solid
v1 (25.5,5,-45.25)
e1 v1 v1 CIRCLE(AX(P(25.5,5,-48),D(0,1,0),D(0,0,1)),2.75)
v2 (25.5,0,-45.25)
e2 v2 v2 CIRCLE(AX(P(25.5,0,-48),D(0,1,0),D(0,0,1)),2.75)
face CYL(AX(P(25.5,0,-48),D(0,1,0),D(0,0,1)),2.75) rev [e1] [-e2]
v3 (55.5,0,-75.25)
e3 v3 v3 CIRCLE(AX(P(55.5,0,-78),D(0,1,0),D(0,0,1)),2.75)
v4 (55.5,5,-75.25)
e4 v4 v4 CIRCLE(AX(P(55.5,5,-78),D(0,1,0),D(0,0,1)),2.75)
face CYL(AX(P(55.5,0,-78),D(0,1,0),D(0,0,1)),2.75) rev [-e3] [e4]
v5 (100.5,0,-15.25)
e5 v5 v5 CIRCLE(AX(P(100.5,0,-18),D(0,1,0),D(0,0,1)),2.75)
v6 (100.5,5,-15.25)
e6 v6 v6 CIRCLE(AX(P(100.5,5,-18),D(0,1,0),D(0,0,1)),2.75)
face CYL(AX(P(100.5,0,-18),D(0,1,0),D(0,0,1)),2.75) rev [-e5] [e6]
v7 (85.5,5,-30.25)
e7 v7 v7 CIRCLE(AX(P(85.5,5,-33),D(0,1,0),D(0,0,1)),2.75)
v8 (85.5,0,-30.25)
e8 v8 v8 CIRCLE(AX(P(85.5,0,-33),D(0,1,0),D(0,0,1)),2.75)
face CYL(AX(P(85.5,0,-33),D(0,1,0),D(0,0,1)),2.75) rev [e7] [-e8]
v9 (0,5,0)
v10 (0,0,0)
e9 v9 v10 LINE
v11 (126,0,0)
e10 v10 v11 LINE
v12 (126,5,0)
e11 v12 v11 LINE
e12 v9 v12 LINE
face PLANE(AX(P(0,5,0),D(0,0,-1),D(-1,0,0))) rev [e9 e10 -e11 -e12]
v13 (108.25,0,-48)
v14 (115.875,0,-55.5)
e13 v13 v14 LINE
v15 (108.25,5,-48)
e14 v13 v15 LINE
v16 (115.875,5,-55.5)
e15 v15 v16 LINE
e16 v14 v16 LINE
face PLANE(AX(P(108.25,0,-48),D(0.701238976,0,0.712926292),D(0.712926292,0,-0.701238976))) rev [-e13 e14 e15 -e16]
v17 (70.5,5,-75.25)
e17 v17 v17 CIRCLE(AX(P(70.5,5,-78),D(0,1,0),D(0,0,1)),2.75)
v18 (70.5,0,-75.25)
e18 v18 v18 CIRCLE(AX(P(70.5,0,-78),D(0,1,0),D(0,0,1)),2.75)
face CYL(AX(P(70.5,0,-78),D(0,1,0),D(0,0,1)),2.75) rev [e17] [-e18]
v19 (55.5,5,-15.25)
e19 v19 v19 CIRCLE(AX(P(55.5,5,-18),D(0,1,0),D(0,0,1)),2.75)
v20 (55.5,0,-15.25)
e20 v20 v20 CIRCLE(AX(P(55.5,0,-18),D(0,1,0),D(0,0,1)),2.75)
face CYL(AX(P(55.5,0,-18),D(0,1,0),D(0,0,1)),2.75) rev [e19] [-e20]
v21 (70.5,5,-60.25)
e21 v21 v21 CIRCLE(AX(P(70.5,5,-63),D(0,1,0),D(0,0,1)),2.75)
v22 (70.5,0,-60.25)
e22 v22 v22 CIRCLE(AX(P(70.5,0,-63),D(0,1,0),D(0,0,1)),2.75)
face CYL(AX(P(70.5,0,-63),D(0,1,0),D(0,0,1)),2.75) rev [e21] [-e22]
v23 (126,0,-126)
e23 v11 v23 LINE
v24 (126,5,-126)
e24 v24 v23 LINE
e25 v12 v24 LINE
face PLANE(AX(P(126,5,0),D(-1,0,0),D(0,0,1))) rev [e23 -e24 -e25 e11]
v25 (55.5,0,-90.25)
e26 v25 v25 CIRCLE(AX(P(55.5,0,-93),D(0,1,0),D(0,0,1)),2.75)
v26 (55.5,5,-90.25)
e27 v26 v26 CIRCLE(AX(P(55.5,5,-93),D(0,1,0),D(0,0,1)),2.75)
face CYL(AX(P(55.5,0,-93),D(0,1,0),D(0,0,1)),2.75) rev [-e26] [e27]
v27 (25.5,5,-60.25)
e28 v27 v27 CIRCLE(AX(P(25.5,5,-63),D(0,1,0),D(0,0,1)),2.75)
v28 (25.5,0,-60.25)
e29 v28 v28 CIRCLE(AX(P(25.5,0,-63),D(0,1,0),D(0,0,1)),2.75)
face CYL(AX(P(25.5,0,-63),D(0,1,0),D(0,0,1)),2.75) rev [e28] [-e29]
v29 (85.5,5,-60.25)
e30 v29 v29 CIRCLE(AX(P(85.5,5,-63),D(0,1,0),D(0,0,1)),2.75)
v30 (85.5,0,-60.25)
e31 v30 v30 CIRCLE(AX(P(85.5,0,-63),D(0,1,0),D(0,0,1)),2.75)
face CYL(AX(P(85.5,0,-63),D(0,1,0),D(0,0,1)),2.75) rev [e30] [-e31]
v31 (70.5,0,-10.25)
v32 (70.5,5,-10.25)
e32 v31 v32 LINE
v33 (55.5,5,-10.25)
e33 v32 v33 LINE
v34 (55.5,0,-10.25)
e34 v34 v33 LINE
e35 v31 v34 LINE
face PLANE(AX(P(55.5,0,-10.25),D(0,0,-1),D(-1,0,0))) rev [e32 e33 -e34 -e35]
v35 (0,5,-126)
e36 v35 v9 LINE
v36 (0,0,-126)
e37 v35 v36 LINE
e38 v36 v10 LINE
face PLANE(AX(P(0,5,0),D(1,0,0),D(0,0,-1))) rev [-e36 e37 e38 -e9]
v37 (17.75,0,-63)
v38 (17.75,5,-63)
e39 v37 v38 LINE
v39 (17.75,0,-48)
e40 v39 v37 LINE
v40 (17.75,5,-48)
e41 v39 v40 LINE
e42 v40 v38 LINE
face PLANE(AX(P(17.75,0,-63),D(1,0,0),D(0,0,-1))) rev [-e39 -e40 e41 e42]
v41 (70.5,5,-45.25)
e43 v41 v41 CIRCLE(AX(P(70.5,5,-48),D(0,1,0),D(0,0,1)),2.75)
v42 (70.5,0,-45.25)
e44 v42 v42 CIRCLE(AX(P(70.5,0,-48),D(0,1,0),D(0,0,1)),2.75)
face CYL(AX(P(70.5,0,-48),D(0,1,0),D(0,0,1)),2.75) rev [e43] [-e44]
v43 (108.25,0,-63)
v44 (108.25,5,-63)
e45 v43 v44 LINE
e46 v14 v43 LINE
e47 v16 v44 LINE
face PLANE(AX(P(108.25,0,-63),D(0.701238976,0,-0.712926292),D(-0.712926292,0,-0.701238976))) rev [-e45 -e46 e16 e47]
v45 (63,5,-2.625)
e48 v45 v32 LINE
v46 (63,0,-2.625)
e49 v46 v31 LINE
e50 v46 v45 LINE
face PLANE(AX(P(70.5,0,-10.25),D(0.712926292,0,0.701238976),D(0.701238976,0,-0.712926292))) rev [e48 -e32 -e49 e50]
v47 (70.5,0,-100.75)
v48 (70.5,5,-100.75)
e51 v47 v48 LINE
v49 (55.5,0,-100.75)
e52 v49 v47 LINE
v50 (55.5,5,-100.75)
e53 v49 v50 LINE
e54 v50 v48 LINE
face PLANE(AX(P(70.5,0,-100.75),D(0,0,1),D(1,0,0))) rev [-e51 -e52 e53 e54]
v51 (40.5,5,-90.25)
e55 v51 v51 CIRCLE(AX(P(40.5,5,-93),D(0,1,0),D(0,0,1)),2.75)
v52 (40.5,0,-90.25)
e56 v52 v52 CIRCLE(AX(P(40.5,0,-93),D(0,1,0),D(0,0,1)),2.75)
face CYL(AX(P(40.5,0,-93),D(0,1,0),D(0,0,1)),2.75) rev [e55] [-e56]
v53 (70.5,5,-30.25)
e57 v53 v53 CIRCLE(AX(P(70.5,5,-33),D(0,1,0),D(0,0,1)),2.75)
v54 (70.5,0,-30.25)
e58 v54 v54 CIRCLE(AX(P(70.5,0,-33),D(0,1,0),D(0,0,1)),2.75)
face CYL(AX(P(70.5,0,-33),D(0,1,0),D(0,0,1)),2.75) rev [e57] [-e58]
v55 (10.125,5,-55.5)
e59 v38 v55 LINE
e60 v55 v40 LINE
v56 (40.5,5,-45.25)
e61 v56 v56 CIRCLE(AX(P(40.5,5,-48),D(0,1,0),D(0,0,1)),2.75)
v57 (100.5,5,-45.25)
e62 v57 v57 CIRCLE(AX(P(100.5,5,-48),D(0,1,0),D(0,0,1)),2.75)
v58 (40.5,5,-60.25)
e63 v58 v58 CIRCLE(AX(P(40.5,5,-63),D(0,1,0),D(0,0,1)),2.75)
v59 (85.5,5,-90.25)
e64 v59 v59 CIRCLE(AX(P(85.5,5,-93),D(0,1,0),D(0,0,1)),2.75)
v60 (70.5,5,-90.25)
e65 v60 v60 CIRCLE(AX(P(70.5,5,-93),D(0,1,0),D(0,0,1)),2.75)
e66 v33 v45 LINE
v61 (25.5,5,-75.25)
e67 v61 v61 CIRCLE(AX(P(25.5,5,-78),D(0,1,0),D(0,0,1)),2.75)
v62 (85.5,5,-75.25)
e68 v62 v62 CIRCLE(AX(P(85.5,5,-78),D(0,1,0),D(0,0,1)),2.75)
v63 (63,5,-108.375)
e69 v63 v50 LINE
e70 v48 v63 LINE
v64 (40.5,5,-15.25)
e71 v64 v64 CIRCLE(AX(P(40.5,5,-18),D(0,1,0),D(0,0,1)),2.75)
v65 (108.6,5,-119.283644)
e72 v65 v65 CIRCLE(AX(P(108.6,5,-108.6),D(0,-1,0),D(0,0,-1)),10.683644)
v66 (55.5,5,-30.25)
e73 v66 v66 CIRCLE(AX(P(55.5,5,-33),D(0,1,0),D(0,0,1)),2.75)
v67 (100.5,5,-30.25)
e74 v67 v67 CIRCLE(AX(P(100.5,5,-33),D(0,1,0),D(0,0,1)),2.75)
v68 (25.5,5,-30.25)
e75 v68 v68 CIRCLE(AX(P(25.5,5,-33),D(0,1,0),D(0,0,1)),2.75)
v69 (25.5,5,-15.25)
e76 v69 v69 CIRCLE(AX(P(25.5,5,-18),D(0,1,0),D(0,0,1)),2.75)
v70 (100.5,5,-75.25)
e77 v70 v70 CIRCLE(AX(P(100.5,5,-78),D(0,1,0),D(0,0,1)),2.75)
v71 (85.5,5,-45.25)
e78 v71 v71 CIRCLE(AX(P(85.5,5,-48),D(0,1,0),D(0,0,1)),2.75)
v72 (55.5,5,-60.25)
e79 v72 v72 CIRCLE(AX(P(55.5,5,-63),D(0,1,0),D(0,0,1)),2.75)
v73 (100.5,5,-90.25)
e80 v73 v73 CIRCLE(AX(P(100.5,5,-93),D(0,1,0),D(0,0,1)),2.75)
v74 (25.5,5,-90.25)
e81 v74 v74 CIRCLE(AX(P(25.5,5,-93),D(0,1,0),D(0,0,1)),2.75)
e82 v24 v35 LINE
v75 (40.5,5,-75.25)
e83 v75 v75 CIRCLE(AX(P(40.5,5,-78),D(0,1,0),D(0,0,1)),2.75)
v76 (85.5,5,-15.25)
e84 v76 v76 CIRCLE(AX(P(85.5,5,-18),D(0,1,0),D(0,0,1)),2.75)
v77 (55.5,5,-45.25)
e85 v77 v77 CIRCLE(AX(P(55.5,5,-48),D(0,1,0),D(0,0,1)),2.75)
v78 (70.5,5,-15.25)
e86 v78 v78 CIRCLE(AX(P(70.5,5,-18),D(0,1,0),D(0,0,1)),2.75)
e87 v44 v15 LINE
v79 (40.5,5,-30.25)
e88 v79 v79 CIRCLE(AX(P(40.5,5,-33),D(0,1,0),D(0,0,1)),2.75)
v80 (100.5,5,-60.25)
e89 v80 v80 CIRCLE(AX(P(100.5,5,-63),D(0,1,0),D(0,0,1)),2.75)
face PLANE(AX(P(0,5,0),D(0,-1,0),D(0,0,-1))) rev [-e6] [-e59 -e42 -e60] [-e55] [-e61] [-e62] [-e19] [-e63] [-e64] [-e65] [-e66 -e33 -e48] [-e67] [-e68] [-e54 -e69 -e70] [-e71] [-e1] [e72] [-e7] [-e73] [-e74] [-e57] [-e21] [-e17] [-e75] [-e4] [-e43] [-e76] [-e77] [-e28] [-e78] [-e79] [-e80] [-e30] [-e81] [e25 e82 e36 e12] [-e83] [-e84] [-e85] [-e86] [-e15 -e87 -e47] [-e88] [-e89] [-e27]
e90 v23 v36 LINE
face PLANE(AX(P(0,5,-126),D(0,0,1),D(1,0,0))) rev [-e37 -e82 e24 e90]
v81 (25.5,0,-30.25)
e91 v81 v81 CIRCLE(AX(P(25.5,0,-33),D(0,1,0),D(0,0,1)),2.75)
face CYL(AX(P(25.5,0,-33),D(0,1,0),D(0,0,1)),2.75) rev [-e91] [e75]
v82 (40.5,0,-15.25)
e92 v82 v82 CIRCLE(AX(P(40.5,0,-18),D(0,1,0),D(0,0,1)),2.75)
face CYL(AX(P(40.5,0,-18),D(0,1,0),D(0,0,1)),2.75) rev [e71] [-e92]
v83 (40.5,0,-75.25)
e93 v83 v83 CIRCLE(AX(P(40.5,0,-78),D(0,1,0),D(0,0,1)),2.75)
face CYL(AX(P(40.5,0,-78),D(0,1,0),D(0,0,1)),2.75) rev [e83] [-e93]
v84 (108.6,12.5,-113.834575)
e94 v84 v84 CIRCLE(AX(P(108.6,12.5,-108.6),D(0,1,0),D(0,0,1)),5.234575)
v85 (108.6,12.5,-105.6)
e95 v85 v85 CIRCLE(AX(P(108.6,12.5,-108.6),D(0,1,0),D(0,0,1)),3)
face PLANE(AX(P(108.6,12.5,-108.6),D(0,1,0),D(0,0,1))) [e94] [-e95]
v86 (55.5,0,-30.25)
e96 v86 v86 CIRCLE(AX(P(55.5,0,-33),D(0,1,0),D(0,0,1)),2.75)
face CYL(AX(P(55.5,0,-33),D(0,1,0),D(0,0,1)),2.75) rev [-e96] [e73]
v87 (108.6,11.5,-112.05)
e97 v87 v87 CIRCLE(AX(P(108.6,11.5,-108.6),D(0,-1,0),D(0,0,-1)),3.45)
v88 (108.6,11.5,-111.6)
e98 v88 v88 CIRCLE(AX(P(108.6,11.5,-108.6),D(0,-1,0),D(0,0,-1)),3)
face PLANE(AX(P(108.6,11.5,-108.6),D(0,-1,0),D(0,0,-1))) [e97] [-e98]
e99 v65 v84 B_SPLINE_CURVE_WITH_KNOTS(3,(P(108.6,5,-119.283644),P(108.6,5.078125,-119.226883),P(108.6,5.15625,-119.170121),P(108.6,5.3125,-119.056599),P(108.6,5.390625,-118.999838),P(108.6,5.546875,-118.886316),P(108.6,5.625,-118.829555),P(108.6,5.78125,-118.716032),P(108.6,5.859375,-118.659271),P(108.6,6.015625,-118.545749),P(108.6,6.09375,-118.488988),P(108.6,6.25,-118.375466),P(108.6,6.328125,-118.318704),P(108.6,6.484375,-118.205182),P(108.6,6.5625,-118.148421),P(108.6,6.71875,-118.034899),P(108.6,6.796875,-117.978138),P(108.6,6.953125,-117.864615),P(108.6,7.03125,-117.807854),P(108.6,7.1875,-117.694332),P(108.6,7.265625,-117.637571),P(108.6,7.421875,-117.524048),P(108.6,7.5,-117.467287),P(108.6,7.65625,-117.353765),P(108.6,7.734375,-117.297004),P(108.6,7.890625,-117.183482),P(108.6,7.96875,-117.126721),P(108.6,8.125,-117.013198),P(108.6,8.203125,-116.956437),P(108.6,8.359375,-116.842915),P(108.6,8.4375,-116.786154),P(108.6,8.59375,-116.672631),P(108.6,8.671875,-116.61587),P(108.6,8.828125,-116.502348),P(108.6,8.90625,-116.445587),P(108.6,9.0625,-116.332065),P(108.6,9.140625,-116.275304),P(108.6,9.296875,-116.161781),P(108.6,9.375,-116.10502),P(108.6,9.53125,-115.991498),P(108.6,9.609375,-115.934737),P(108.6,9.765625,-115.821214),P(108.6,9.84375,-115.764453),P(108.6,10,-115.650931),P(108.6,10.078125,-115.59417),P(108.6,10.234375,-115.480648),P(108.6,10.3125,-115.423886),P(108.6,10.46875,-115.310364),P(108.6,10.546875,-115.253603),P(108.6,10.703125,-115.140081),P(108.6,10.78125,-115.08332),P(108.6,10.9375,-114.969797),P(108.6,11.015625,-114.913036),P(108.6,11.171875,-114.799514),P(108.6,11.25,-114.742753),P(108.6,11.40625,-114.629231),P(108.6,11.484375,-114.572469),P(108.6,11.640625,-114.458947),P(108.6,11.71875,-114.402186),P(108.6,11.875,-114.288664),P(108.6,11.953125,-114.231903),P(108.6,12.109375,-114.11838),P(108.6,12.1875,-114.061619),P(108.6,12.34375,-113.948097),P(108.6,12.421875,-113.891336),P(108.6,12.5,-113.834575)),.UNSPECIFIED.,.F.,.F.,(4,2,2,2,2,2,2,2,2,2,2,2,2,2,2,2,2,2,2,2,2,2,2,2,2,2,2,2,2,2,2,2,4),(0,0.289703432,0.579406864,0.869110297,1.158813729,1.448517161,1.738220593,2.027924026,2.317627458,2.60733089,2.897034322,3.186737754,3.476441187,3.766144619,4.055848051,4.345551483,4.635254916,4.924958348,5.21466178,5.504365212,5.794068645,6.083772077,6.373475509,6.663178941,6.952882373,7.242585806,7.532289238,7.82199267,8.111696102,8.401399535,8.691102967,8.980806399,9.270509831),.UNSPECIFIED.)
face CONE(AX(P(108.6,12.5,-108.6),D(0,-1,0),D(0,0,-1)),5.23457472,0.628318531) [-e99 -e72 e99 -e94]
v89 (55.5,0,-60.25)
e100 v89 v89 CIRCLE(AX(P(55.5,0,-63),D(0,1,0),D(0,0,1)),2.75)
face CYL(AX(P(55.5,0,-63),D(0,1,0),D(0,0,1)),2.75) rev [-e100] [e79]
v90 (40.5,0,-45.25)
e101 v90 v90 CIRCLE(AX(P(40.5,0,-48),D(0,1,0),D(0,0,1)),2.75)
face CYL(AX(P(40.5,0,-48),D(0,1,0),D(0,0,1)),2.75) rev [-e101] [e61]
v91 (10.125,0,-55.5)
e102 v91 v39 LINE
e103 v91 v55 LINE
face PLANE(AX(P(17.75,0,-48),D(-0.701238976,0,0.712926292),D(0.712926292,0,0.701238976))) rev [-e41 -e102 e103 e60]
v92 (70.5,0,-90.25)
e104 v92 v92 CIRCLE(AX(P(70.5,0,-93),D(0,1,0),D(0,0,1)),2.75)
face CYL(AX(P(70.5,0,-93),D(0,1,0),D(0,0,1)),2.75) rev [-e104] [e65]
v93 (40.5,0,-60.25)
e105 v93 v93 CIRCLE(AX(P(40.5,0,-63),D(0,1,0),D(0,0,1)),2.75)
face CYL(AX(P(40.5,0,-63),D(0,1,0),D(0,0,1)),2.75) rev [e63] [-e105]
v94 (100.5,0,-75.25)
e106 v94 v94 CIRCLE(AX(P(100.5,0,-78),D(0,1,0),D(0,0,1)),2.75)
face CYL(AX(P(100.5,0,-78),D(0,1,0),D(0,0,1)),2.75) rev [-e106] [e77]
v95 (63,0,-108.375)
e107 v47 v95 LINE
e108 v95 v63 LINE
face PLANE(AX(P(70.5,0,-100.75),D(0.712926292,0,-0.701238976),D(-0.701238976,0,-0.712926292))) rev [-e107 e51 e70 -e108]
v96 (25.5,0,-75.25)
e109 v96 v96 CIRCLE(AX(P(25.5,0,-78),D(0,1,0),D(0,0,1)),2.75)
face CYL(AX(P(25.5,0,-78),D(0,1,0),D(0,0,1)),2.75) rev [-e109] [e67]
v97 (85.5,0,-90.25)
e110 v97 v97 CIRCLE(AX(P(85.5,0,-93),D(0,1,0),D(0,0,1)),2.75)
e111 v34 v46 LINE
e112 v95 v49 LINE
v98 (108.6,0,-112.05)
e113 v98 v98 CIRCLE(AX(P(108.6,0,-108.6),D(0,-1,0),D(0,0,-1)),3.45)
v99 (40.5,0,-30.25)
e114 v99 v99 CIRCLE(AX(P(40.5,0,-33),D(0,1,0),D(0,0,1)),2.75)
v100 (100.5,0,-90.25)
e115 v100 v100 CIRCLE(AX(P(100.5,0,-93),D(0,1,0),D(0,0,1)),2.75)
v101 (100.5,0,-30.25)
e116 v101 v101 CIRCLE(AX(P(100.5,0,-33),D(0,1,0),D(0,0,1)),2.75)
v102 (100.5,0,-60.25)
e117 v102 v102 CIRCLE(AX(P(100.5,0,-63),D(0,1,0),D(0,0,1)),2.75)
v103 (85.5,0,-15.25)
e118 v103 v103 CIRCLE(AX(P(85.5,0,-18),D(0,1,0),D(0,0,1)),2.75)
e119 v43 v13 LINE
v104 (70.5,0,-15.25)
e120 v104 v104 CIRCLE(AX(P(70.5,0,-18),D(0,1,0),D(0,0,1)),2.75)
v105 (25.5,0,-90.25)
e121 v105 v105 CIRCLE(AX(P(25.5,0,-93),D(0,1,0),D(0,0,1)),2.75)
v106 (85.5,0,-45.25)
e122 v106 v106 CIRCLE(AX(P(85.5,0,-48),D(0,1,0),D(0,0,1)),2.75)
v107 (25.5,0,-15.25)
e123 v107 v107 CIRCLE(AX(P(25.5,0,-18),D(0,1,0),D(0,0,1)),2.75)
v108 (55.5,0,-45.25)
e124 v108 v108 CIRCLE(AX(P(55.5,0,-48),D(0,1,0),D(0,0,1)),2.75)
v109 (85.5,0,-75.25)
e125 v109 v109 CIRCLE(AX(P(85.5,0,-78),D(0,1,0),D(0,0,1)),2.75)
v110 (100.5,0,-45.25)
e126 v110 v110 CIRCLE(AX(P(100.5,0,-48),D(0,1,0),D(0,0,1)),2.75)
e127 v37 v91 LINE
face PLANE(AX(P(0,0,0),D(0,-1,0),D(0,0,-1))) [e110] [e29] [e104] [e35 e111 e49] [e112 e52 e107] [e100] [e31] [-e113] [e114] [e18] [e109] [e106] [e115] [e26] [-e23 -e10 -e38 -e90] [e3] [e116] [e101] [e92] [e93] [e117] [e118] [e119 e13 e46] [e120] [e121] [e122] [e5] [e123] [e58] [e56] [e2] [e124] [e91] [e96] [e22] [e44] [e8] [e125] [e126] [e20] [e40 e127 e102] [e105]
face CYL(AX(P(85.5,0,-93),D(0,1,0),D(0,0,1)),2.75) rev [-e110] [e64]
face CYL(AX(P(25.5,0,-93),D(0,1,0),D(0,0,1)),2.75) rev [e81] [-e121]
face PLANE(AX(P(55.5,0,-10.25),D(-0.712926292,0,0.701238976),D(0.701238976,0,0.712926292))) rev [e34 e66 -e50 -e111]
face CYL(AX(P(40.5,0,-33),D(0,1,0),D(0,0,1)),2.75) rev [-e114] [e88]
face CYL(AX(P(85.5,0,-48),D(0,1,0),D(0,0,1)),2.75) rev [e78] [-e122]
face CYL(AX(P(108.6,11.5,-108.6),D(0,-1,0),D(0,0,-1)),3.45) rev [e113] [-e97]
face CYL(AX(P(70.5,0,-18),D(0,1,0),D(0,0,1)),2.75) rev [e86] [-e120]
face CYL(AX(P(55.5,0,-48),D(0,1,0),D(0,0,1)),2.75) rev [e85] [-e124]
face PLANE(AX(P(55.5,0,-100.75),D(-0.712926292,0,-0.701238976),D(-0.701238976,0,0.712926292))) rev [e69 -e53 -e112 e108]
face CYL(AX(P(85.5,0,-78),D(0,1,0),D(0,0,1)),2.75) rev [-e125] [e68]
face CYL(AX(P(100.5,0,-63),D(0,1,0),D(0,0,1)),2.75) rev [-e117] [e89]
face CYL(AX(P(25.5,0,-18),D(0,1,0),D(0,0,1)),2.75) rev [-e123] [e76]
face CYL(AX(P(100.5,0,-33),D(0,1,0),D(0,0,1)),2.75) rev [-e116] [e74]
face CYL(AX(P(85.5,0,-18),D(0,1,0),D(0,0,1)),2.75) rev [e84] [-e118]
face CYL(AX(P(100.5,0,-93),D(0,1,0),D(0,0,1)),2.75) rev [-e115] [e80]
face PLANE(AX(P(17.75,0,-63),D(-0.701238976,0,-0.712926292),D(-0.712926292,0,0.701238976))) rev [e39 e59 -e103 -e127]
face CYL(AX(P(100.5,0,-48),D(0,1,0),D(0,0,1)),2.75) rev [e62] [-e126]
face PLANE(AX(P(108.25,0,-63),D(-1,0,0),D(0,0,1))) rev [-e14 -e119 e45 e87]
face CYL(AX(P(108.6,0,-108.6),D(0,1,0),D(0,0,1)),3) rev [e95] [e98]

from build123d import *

# Parameters (mm, degrees)
SKETCH1_W           = 126
SKETCH1_H           = 126
BOSS_EXTRUDE1_DEPTH = 5
SKETCH3_R           = 12.5
BOSS_EXTRUDE2_DEPTH = 7.5
SKETCH4_R           = 3.45
CUT_EXTRUDE1_DEPTH  = 11.5
SKETCH6_R           = 3
CUT_EXTRUDE2_DEPTH  = 179.628805068
CHAMFER1_SIZE       = 10
CHAMFER1_SIZE_2     = 7.26542528
SKETCH7_R           = 2.75
CUT_EXTRUDE3_DEPTH  = 179.348675353
CUT_EXTRUDE4_DEPTH  = 179.348675353


with BuildPart() as part:
    # Sketch1 → Boss-Extrude1 (new body)
    with BuildSketch(Plane(origin=(0, 0, 0), x_dir=(1, 0, 0), z_dir=(0, 1, 0))):
        with Locations((63, 63)):
            Rectangle(SKETCH1_W, SKETCH1_H)
    extrude(amount=BOSS_EXTRUDE1_DEPTH)

    # Sketch3 → Boss-Extrude2 (add)
    with BuildSketch(Plane(origin=(0, 5, 0), x_dir=(1, 0, 0), z_dir=(0, 1, 0))):
        with Locations(Location((108.6, 108.6, 0), (0, 0, 90))):
            Circle(SKETCH3_R)
    extrude(amount=BOSS_EXTRUDE2_DEPTH)

    # Sketch4 → Cut-Extrude1 (cut)
    with BuildSketch(Plane.XZ):
        with Locations(Location((108.6, -108.6, 0), (0, 0, 270))):
            Circle(SKETCH4_R)
    extrude(amount=-CUT_EXTRUDE1_DEPTH, mode=Mode.SUBTRACT)

    # Sketch6 → Cut-Extrude2 (cut, through all)
    with BuildSketch(Plane(origin=(0, 12.5, 0), x_dir=(1, 0, 0), z_dir=(0, 1, 0))):
        with Locations(Location((108.6, 108.6, 0), (0, 0, 270))):
            Circle(SKETCH6_R)
    extrude(amount=-CUT_EXTRUDE2_DEPTH, mode=Mode.SUBTRACT)

    # Chamfer1
    # the kernel refuses this chamfer: 10, 7.26542528 mm, written as the material it takes off along each edge
    with BuildSketch(Plane(origin=(108.6, 12.5, -108.6), x_dir=(0, 0, -1), z_dir=(1, 0, 0))) as chamfer1_piece_1_section:
        Polygon((12.5, -CHAMFER1_SIZE), (12.5 - CHAMFER1_SIZE_2, 0), (12.5, 0), align=None)
    chamfer1_piece_1 = revolve(axis=Axis((108.6, 12.5, -108.6), (0, 1, 0)), mode=Mode.PRIVATE)
    chamfer1_piece_1 = split(chamfer1_piece_1, bisect_by=Plane(origin=(108.6, 5, -108.6), z_dir=(0, 1, 0)), keep=Keep.TOP, mode=Mode.PRIVATE)
    add(chamfer1_piece_1, mode=Mode.SUBTRACT)

    # Sketch7 → Cut-Extrude3 (cut, through all)
    with BuildSketch(Plane(origin=(0, 5, 0), x_dir=(1, 0, 0), z_dir=(0, 1, 0))):
        with Locations(Location((55.5, 63, 0), (0, 0, 270))):
            Circle(SKETCH7_R)
        with Locations(Location((70.5, 63, 0), (0, 0, 270))):
            Circle(SKETCH7_R)
        with Locations(Location((40.5, 63, 0), (0, 0, 270))):
            Circle(SKETCH7_R)
        with Locations(Location((85.5, 63, 0), (0, 0, 270))):
            Circle(SKETCH7_R)
        with Locations(Location((25.5, 63, 0), (0, 0, 270))):
            Circle(SKETCH7_R)
        with Locations(Location((100.5, 63, 0), (0, 0, 270))):
            Circle(SKETCH7_R)
        with Locations(Location((25.5, 48, 0), (0, 0, 270))):
            Circle(SKETCH7_R)
        with Locations(Location((40.5, 48, 0), (0, 0, 270))):
            Circle(SKETCH7_R)
        with Locations(Location((55.5, 48, 0), (0, 0, 270))):
            Circle(SKETCH7_R)
        with Locations(Location((70.5, 48, 0), (0, 0, 270))):
            Circle(SKETCH7_R)
        with Locations(Location((85.5, 48, 0), (0, 0, 270))):
            Circle(SKETCH7_R)
        with Locations(Location((100.5, 48, 0), (0, 0, 270))):
            Circle(SKETCH7_R)
        with Locations(Location((25.5, 33, 0), (0, 0, 270))):
            Circle(SKETCH7_R)
        with Locations(Location((40.5, 33, 0), (0, 0, 270))):
            Circle(SKETCH7_R)
        with Locations(Location((55.5, 33, 0), (0, 0, 270))):
            Circle(SKETCH7_R)
        with Locations(Location((70.5, 33, 0), (0, 0, 270))):
            Circle(SKETCH7_R)
        with Locations(Location((85.5, 33, 0), (0, 0, 270))):
            Circle(SKETCH7_R)
        with Locations(Location((100.5, 33, 0), (0, 0, 270))):
            Circle(SKETCH7_R)
        with Locations(Location((25.5, 18, 0), (0, 0, 270))):
            Circle(SKETCH7_R)
        with Locations(Location((40.5, 18, 0), (0, 0, 270))):
            Circle(SKETCH7_R)
        with Locations(Location((55.5, 18, 0), (0, 0, 270))):
            Circle(SKETCH7_R)
        with Locations(Location((70.5, 18, 0), (0, 0, 270))):
            Circle(SKETCH7_R)
        with Locations(Location((85.5, 18, 0), (0, 0, 270))):
            Circle(SKETCH7_R)
        with Locations(Location((100.5, 18, 0), (0, 0, 270))):
            Circle(SKETCH7_R)
        with Locations(Location((25.5, 78, 0), (0, 0, 270))):
            Circle(SKETCH7_R)
        with Locations(Location((40.5, 78, 0), (0, 0, 270))):
            Circle(SKETCH7_R)
        with Locations(Location((55.5, 78, 0), (0, 0, 270))):
            Circle(SKETCH7_R)
        with Locations(Location((70.5, 78, 0), (0, 0, 270))):
            Circle(SKETCH7_R)
        with Locations(Location((85.5, 78, 0), (0, 0, 270))):
            Circle(SKETCH7_R)
        with Locations(Location((100.5, 78, 0), (0, 0, 270))):
            Circle(SKETCH7_R)
        with Locations(Location((25.5, 93, 0), (0, 0, 270))):
            Circle(SKETCH7_R)
        with Locations(Location((40.5, 93, 0), (0, 0, 270))):
            Circle(SKETCH7_R)
        with Locations(Location((55.5, 93, 0), (0, 0, 270))):
            Circle(SKETCH7_R)
        with Locations(Location((70.5, 93, 0), (0, 0, 270))):
            Circle(SKETCH7_R)
        with Locations(Location((85.5, 93, 0), (0, 0, 270))):
            Circle(SKETCH7_R)
        with Locations(Location((100.5, 93, 0), (0, 0, 270))):
            Circle(SKETCH7_R)
    extrude(amount=-CUT_EXTRUDE3_DEPTH, mode=Mode.SUBTRACT)

    # Sketch8 → Cut-Extrude4 (cut, through all)
    with BuildSketch(Plane(origin=(0, 5, 0), x_dir=(1, 0, 0), z_dir=(0, 1, 0))):
        Polygon((70.5, 100.75), (63, 108.375), (55.5, 100.75), align=None)
        Polygon((108.25, 63), (115.875, 55.5), (108.25, 48), align=None)
        Polygon((55.5, 10.25), (63, 2.625), (70.5, 10.25), align=None)
        Polygon((17.75, 63), (17.75, 48), (10.125, 55.5), align=None)
    extrude(amount=-CUT_EXTRUDE4_DEPTH, mode=Mode.SUBTRACT)


solid = part.part
